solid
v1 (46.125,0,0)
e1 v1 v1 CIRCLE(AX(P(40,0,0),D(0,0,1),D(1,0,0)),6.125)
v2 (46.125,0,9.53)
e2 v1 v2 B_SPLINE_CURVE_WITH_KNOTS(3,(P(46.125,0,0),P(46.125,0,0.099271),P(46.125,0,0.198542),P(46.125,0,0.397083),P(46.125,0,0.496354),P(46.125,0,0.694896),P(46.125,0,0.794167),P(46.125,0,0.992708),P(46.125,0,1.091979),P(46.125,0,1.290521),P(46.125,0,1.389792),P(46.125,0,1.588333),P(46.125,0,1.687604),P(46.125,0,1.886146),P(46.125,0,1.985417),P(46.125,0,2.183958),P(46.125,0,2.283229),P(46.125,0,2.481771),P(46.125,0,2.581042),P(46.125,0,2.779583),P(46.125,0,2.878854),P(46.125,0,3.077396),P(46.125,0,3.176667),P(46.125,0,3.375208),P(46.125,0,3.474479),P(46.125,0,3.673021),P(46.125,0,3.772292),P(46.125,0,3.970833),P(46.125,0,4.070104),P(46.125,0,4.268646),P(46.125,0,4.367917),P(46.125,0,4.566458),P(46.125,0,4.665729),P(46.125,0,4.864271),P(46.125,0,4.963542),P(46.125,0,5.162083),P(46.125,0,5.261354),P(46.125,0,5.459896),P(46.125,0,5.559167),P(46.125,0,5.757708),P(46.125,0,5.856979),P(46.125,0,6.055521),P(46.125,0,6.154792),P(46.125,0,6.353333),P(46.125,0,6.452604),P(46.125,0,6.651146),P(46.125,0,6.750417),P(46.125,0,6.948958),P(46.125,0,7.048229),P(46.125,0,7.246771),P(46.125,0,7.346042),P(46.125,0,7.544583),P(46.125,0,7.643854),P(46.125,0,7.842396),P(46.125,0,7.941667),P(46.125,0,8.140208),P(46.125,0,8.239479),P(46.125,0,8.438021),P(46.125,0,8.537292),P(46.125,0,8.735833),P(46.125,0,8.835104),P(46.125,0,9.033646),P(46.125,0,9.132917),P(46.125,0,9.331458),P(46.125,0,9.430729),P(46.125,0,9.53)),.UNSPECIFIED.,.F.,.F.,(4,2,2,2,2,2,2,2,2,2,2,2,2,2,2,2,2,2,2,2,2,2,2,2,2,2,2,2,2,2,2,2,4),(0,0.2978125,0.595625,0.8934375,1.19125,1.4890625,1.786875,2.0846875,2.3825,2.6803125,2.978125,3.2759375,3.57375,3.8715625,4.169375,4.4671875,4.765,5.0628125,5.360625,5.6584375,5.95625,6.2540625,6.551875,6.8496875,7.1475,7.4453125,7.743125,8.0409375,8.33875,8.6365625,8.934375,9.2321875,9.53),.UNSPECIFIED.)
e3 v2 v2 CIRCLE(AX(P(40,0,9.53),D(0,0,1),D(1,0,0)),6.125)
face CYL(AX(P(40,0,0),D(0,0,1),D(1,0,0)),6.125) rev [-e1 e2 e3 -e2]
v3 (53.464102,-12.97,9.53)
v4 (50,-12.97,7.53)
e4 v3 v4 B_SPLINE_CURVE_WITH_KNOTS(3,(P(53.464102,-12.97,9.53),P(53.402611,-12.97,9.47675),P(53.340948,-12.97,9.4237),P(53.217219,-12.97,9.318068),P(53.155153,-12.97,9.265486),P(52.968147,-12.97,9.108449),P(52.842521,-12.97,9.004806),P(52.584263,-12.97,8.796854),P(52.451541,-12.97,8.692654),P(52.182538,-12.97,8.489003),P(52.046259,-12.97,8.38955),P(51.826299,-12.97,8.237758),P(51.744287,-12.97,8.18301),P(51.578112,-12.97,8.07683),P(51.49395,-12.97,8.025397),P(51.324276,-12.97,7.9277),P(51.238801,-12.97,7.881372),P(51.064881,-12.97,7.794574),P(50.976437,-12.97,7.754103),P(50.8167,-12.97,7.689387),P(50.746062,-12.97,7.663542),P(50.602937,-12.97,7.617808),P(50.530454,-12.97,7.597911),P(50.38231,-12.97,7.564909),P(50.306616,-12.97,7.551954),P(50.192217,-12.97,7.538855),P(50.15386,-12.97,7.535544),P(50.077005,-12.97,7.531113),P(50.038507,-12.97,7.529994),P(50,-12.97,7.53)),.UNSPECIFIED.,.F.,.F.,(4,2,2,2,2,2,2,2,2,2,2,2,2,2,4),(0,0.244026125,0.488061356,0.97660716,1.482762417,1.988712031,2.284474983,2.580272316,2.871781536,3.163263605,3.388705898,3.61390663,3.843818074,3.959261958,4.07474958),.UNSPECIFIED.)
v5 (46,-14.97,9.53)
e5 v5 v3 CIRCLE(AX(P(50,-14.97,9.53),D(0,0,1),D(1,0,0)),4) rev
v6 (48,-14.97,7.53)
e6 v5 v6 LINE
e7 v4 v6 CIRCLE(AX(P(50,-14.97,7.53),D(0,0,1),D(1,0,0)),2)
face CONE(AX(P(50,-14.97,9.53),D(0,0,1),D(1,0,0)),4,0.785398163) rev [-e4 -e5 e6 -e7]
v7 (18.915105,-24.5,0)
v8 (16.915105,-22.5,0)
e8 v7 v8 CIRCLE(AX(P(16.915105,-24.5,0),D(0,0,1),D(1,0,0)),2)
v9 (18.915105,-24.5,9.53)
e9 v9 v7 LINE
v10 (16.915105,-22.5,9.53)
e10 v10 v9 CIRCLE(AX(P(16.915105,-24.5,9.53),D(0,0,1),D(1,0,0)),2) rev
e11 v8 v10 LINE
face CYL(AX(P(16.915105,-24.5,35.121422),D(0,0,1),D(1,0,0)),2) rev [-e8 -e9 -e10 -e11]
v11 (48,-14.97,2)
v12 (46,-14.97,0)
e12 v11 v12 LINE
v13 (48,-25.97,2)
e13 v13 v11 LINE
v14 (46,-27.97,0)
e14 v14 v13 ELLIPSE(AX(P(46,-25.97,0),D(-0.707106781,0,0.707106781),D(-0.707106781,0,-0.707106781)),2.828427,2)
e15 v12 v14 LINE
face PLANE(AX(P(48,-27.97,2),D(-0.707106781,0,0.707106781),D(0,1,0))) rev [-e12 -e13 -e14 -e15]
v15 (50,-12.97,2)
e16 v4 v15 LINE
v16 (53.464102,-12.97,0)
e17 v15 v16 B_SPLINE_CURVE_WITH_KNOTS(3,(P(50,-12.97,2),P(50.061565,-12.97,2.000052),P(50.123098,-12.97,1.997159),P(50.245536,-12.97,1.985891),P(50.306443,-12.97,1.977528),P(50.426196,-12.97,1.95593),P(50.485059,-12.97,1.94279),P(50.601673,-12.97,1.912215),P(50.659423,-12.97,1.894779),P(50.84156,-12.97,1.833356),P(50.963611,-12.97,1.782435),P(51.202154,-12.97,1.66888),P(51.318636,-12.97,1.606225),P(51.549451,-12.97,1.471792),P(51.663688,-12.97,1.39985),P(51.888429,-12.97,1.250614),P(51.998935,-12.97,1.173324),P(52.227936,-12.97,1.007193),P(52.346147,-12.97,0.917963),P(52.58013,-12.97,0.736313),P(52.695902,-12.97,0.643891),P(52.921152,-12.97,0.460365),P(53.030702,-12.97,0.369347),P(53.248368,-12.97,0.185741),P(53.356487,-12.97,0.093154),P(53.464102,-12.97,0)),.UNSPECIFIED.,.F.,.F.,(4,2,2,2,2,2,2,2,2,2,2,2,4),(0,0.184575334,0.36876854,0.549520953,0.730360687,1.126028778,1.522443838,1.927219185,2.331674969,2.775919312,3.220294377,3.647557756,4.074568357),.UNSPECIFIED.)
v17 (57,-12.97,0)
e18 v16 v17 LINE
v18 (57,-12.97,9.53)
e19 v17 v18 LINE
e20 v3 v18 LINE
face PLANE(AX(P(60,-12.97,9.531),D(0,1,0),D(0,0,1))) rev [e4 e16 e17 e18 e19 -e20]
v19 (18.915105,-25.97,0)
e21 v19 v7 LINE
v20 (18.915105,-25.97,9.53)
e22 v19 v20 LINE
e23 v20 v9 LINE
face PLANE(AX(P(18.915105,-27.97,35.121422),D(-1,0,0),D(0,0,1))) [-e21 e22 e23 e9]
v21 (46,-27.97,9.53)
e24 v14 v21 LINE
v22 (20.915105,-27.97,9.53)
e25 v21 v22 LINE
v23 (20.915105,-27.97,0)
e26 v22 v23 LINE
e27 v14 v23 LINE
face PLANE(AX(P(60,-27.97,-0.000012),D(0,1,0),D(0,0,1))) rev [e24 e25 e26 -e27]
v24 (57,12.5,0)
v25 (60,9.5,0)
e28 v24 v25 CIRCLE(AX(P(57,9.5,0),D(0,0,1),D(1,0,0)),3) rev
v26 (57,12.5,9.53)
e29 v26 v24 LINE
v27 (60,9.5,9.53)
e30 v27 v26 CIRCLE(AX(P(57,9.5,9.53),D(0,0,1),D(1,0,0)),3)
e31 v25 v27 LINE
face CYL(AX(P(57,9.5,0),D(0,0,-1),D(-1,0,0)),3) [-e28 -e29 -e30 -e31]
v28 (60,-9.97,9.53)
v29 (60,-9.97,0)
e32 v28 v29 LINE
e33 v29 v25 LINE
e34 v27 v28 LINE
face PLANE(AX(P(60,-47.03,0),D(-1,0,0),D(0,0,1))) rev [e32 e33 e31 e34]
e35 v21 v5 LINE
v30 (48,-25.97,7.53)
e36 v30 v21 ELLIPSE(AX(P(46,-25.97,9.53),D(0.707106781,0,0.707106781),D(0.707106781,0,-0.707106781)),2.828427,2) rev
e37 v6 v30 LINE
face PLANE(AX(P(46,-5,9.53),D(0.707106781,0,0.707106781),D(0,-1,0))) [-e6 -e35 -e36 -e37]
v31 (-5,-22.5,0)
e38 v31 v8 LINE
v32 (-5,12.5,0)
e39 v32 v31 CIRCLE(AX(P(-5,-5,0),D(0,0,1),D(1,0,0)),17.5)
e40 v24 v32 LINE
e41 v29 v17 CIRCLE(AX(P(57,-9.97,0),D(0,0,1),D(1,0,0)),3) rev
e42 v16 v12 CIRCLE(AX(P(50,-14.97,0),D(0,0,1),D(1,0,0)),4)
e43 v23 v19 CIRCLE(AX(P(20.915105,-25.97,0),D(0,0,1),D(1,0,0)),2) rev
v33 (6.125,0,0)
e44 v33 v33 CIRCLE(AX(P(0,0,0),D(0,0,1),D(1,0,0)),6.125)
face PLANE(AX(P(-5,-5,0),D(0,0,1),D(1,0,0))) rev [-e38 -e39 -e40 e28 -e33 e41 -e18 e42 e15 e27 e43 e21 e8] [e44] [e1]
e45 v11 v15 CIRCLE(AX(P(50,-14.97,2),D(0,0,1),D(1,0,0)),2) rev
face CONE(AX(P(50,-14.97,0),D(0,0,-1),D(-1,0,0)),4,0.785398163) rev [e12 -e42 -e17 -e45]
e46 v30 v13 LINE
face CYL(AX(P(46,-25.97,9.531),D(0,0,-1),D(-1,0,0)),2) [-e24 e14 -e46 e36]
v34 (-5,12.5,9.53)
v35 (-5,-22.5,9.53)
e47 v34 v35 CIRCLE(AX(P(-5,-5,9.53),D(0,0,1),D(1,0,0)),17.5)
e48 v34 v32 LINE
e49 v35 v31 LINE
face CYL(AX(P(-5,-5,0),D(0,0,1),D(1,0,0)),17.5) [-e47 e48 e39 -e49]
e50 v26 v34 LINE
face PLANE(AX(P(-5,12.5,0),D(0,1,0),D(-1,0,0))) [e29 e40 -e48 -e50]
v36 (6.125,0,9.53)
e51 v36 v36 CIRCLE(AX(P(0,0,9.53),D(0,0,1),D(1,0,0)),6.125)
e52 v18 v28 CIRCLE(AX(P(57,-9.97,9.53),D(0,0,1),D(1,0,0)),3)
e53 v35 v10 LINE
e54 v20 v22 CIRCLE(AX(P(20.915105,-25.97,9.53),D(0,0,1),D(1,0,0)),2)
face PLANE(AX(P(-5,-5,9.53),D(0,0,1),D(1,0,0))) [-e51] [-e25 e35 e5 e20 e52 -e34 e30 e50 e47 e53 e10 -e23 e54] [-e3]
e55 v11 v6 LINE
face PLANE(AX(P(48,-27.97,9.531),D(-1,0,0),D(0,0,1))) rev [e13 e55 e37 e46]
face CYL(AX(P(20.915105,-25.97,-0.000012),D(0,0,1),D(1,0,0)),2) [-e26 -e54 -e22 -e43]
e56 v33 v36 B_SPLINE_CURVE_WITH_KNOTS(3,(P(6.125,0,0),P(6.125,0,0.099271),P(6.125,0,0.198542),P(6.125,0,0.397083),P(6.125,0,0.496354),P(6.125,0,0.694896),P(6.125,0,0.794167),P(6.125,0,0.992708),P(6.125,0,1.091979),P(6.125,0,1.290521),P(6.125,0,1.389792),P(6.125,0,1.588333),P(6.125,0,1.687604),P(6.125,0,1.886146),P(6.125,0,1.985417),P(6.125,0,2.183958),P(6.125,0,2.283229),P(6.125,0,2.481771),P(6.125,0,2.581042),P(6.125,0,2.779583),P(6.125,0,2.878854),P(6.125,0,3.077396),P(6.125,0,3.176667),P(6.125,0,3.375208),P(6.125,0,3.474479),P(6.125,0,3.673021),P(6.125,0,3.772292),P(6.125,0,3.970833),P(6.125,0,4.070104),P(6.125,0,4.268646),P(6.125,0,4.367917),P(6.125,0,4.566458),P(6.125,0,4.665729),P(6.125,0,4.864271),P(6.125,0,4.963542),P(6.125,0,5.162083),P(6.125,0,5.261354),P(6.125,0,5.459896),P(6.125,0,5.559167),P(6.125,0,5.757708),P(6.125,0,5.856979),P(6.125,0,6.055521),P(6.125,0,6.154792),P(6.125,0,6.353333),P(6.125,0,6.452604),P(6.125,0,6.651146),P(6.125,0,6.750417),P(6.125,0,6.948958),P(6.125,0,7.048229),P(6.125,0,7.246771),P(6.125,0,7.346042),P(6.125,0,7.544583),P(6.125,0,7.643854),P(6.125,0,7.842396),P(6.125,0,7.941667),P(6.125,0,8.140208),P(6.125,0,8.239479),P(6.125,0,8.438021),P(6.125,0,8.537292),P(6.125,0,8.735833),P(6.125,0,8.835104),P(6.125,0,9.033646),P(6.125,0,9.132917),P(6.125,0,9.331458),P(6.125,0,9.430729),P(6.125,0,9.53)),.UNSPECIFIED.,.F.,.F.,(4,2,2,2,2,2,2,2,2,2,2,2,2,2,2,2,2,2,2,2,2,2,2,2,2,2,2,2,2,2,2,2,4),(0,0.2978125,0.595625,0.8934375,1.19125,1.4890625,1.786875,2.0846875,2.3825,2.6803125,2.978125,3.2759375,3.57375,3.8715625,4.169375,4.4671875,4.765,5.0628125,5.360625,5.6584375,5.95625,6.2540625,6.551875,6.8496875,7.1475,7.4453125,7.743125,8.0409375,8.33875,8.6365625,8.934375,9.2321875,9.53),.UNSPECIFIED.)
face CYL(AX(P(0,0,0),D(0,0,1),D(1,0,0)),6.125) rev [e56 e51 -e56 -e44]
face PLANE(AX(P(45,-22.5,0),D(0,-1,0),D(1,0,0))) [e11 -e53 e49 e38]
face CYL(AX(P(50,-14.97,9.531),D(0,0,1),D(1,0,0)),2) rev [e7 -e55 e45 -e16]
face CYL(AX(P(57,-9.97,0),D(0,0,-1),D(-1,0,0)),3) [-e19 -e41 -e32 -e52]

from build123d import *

# Parameters (mm, degrees)
CROQUIS1_R                       = 6.125
SALIENTE_EXTRUIR1_DEPTH          = 9.53
BRIDA_DE_ARISTA1_STRIP_W         = 57.18
BRIDA_DE_ARISTA1_STRIP_H         = 9.53
BRIDA_DE_ARISTA1_STRIP_CUT_DEPTH = 85
BRIDA_DE_ARISTA1_DEPTH           = 85
REDONDEO1_R                      = 10
CHAFL_N1_SIZE                    = 25
CHAFL_N1_SIZE2                   = 20
REDONDEO2_R                      = 20
CORTAR_EXTRUIR3_DEPTH            = 148.009594705
CORTAR_EXTRUIR3_DEPTH_BACK       = 148.009594705
CROQUIS7_W                       = 70
CROQUIS7_H                       = 50
CORTAR_EXTRUIR5_DEPTH            = 92.169188443
CORTAR_EXTRUIR5_DEPTH_BACK       = 92.169188443
CROQUIS8_W                       = 21.963248134
CROQUIS8_H                       = 19.06
CORTAR_EXTRUIR6_REACH            = 68.882
CROQUIS10_W                      = 12
CROQUIS10_H                      = 15
SALIENTE_EXTRUIR3_START          = -9.53
SALIENTE_EXTRUIR3_DEPTH          = 9.53
REDONDEO3_R                      = 3
REDONDEO4_R                      = 2
CHAFL_N2_SIZE                    = 2


# Sheet-metal steps are written as plain solids
with BuildPart() as part:
    # Croquis1 → Saliente-Extruir1 (new body)
    with BuildSketch(Plane.XY):
        with BuildLine():
            Line((-5, 12.5), (59.758688568, 12.5))
            ThreePointArc((59.758688568, 12.5), (63.068757982, 11.936283192), (66.005639043, 10.308688094))
            Line((66.005639043, 10.308688094), (70.527359279, 6.691311906))
            ThreePointArc((70.527359279, 6.691311906), (73.464240341, 5.063716808), (76.774309755, 4.5))
            Line((76.774309755, 4.5), (123.266499161, 4.5))
            ThreePointArc((123.266499161, 4.5), (125.848488059, 3.781744193), (127.688665549, 1.833333333))
            ThreePointArc((127.688665549, 1.833333333), (129.41356885, -2.692366017), (130, -7.5))
            Line((130, -7.5), (130, -37.5))
            Line((130, -37.5), (45, -37.5))
            Line((45, -37.5), (45, -22.5))
            Line((45, -22.5), (-5, -22.5))
            ThreePointArc((-5, -22.5), (-22.5, -5), (-5, 12.5))
        make_face()
        Circle(CROQUIS1_R, mode=Mode.SUBTRACT)
        with Locations((40, 0)):
            Circle(CROQUIS1_R, mode=Mode.SUBTRACT)
    extrude(amount=SALIENTE_EXTRUIR1_DEPTH)

    # Brida de arista1 strip (across the edge) → Brida de arista1 strip cut (cut)
    with BuildSketch(Plane(origin=(45, -37.5, 9.53), x_dir=(0, 1, 0), z_dir=(1, 0, 0))):
        with Locations((-19.06, -4.765)):
            Rectangle(BRIDA_DE_ARISTA1_STRIP_W, BRIDA_DE_ARISTA1_STRIP_H)
    extrude(amount=BRIDA_DE_ARISTA1_STRIP_CUT_DEPTH, mode=Mode.SUBTRACT)

    # Brida de arista1 section (across the edge) → Brida de arista1 (add)
    with BuildSketch(Plane(origin=(45, -37.5, 9.53), x_dir=(0, 1, 0), z_dir=(1, 0, 0))):
        with BuildLine():
            Line((-9.53, 9.53), (-9.53, 40.47))
            Line((-9.53, 40.47), (0, 40.47))
            Line((0, 40.47), (0, 9.53))
            ThreePointArc((0, 9.53), (2.791272375, 2.791272375), (9.53, 0))
            Line((9.53, 0), (9.53, -9.53))
            ThreePointArc((9.53, -9.53), (-3.947455249, -3.947455249), (-9.53, 9.53))
        make_face()
    extrude(amount=BRIDA_DE_ARISTA1_DEPTH)

    # Redondeo1
    redondeo1_edges = [part.edges().sort_by_distance(p)[0] for p in [
        (45, -22.5, 4.765),
        (45, -42.265, 50),
    ]]
    fillet(redondeo1_edges, radius=REDONDEO1_R)

    # Chaflán1
    chafl_n1_edges = [part.edges().sort_by_distance(p)[0] for p in [
        (130, -42.265, 50),
    ]]
    chafl_n1_side = [part.faces().sort_by_distance(p)[0] for p in [
        (130, -17.735, 0.637386923),
    ]]
    chamfer(chafl_n1_edges, length=CHAFL_N1_SIZE, length2=CHAFL_N1_SIZE2, reference=chafl_n1_side[0])

    # Redondeo2
    redondeo2_edges = [part.edges().sort_by_distance(p)[0] for p in [
        (110, -42.265, 50),
        (130, -42.265, 25),
    ]]
    fillet(redondeo2_edges, radius=REDONDEO2_R)

    # Croquis7 → Cortar-Extruir3 (cut, two sides: drawn at the far end of the back side and taken through both)
    with BuildSketch(Plane(origin=(0, 0, 0), x_dir=(1, 0, 0), z_dir=(0, 1, 0)).offset(-CORTAR_EXTRUIR3_DEPTH_BACK)):
        with Locations((95, -25)):
            Rectangle(CROQUIS7_W, CROQUIS7_H)
    extrude(amount=CORTAR_EXTRUIR3_DEPTH + CORTAR_EXTRUIR3_DEPTH_BACK, mode=Mode.SUBTRACT)

    # Croquis8 → Cortar-Extruir5 (cut, two sides: drawn at the far end of the back side and taken through both)
    with BuildSketch(Plane.XY.offset(-CORTAR_EXTRUIR5_DEPTH_BACK)):
        with Locations((49.018375933, -37.5)):
            Rectangle(CROQUIS8_W, CROQUIS8_H)
    extrude(amount=CORTAR_EXTRUIR5_DEPTH + CORTAR_EXTRUIR5_DEPTH_BACK, mode=Mode.SUBTRACT)

    # Croquis10 → Cortar-Extruir6 (cut, up to next)
    with BuildSketch(Plane(origin=(0, 0, 0), x_dir=(-1, 0, 0), z_dir=(0, 0, -1)), mode=Mode.PRIVATE) as cortar_extruir6_sk1:
        with Locations((-54, -20.47)):
            Rectangle(CROQUIS10_W, CROQUIS10_H)
    cortar_extruir6_tool1 = extrude(cortar_extruir6_sk1.sketch, amount=-CORTAR_EXTRUIR6_REACH, mode=Mode.PRIVATE) & part.part
    add(cortar_extruir6_tool1.solids().sort_by_distance((54, -20.47, 0))[0], mode=Mode.SUBTRACT)

    # Croquis9 → Saliente-Extruir3 (add)
    with BuildSketch(Plane(origin=(0, 0, 0), x_dir=(-1, 0, 0), z_dir=(0, 0, -1)).offset(SALIENTE_EXTRUIR3_START)):
        with BuildLine():
            Line((-18.915105159, -22.5), (-35, -22.5))
            ThreePointArc((-35, -22.5), (-40.229722746, -23.976503065), (-43.915105159, -27.97))
            Line((-43.915105159, -27.97), (-18.915105159, -27.97))
            Line((-18.915105159, -27.97), (-18.915105159, -22.5))
        make_face()
    extrude(amount=SALIENTE_EXTRUIR3_DEPTH)

    # Redondeo3
    redondeo3_edges = [part.edges().sort_by_distance(p)[0] for p in [
        (60, -12.97, 4.765),
        (60, 12.497088016, 4.765),
    ]]
    fillet(redondeo3_edges, radius=REDONDEO3_R)

    # Redondeo4
    redondeo4_edges = [part.edges().sort_by_distance(p)[0] for p in [
        (48, -12.97, 4.765),
        (48, -27.97, 4.765),
        (18.915105159, -27.97, 4.765),
        (18.915105159, -22.5, 4.765),
    ]]
    fillet(redondeo4_edges, radius=REDONDEO4_R)

    # Chaflán2
    # the kernel refuses this chamfer: 2 mm, written as the material it takes off along each edge
    with BuildSketch(Plane(origin=(48, -31.113365976, 0), x_dir=(0.02749587661058563, 0, 0.9996219169112968), z_dir=(0, 1, 0))) as chafl_n2_piece_1:
        Polygon((CHAFL_N2_SIZE * 0.999621916911, -CHAFL_N2_SIZE * 0.0274958766106), (-CHAFL_N2_SIZE * 0.0274958766106, -CHAFL_N2_SIZE * 0.999621916911), (0, 0), align=None)
    extrude(amount=16.143365976, mode=Mode.SUBTRACT)
    with BuildSketch(Plane(origin=(48, -14.97, 9.53), x_dir=(-0.9996219169112968, 0, 0.02749587661058651), z_dir=(0, -1, 0))) as chafl_n2_piece_2:
        Polygon((CHAFL_N2_SIZE * 0.999621916911, CHAFL_N2_SIZE * 0.0274958766106), (-CHAFL_N2_SIZE * 0.0274958766106, CHAFL_N2_SIZE * 0.999621916911), (0, 0), align=None)
    extrude(amount=16.143365976, mode=Mode.SUBTRACT)
    with BuildSketch(Plane(origin=(50, -14.97, 0), x_dir=(0.5386859165215014, -0.8425066666450718, 0), z_dir=(-0.8425066666450718, -0.5386859165215014, 0))) as chafl_n2_piece_3:
        Polygon((2, CHAFL_N2_SIZE), (2 + CHAFL_N2_SIZE, 0), (2, 0), align=None)
    revolve(axis=Axis((50, -14.97, 0), (0, 0, 1)), revolution_arc=237.405771779, mode=Mode.SUBTRACT)
    with BuildSketch(Plane(origin=(50, -14.97, 9.53), x_dir=(0.5386859165215014, -0.8425066666450718, 0), z_dir=(-0.8425066666450718, -0.5386859165215014, 0))) as chafl_n2_piece_4:
        Polygon((2 + CHAFL_N2_SIZE, 0), (2, -CHAFL_N2_SIZE), (2, 0), align=None)
    revolve(axis=Axis((50, -14.97, 9.53), (0, 0, 1)), revolution_arc=237.405771779, mode=Mode.SUBTRACT)


solid = part.part
